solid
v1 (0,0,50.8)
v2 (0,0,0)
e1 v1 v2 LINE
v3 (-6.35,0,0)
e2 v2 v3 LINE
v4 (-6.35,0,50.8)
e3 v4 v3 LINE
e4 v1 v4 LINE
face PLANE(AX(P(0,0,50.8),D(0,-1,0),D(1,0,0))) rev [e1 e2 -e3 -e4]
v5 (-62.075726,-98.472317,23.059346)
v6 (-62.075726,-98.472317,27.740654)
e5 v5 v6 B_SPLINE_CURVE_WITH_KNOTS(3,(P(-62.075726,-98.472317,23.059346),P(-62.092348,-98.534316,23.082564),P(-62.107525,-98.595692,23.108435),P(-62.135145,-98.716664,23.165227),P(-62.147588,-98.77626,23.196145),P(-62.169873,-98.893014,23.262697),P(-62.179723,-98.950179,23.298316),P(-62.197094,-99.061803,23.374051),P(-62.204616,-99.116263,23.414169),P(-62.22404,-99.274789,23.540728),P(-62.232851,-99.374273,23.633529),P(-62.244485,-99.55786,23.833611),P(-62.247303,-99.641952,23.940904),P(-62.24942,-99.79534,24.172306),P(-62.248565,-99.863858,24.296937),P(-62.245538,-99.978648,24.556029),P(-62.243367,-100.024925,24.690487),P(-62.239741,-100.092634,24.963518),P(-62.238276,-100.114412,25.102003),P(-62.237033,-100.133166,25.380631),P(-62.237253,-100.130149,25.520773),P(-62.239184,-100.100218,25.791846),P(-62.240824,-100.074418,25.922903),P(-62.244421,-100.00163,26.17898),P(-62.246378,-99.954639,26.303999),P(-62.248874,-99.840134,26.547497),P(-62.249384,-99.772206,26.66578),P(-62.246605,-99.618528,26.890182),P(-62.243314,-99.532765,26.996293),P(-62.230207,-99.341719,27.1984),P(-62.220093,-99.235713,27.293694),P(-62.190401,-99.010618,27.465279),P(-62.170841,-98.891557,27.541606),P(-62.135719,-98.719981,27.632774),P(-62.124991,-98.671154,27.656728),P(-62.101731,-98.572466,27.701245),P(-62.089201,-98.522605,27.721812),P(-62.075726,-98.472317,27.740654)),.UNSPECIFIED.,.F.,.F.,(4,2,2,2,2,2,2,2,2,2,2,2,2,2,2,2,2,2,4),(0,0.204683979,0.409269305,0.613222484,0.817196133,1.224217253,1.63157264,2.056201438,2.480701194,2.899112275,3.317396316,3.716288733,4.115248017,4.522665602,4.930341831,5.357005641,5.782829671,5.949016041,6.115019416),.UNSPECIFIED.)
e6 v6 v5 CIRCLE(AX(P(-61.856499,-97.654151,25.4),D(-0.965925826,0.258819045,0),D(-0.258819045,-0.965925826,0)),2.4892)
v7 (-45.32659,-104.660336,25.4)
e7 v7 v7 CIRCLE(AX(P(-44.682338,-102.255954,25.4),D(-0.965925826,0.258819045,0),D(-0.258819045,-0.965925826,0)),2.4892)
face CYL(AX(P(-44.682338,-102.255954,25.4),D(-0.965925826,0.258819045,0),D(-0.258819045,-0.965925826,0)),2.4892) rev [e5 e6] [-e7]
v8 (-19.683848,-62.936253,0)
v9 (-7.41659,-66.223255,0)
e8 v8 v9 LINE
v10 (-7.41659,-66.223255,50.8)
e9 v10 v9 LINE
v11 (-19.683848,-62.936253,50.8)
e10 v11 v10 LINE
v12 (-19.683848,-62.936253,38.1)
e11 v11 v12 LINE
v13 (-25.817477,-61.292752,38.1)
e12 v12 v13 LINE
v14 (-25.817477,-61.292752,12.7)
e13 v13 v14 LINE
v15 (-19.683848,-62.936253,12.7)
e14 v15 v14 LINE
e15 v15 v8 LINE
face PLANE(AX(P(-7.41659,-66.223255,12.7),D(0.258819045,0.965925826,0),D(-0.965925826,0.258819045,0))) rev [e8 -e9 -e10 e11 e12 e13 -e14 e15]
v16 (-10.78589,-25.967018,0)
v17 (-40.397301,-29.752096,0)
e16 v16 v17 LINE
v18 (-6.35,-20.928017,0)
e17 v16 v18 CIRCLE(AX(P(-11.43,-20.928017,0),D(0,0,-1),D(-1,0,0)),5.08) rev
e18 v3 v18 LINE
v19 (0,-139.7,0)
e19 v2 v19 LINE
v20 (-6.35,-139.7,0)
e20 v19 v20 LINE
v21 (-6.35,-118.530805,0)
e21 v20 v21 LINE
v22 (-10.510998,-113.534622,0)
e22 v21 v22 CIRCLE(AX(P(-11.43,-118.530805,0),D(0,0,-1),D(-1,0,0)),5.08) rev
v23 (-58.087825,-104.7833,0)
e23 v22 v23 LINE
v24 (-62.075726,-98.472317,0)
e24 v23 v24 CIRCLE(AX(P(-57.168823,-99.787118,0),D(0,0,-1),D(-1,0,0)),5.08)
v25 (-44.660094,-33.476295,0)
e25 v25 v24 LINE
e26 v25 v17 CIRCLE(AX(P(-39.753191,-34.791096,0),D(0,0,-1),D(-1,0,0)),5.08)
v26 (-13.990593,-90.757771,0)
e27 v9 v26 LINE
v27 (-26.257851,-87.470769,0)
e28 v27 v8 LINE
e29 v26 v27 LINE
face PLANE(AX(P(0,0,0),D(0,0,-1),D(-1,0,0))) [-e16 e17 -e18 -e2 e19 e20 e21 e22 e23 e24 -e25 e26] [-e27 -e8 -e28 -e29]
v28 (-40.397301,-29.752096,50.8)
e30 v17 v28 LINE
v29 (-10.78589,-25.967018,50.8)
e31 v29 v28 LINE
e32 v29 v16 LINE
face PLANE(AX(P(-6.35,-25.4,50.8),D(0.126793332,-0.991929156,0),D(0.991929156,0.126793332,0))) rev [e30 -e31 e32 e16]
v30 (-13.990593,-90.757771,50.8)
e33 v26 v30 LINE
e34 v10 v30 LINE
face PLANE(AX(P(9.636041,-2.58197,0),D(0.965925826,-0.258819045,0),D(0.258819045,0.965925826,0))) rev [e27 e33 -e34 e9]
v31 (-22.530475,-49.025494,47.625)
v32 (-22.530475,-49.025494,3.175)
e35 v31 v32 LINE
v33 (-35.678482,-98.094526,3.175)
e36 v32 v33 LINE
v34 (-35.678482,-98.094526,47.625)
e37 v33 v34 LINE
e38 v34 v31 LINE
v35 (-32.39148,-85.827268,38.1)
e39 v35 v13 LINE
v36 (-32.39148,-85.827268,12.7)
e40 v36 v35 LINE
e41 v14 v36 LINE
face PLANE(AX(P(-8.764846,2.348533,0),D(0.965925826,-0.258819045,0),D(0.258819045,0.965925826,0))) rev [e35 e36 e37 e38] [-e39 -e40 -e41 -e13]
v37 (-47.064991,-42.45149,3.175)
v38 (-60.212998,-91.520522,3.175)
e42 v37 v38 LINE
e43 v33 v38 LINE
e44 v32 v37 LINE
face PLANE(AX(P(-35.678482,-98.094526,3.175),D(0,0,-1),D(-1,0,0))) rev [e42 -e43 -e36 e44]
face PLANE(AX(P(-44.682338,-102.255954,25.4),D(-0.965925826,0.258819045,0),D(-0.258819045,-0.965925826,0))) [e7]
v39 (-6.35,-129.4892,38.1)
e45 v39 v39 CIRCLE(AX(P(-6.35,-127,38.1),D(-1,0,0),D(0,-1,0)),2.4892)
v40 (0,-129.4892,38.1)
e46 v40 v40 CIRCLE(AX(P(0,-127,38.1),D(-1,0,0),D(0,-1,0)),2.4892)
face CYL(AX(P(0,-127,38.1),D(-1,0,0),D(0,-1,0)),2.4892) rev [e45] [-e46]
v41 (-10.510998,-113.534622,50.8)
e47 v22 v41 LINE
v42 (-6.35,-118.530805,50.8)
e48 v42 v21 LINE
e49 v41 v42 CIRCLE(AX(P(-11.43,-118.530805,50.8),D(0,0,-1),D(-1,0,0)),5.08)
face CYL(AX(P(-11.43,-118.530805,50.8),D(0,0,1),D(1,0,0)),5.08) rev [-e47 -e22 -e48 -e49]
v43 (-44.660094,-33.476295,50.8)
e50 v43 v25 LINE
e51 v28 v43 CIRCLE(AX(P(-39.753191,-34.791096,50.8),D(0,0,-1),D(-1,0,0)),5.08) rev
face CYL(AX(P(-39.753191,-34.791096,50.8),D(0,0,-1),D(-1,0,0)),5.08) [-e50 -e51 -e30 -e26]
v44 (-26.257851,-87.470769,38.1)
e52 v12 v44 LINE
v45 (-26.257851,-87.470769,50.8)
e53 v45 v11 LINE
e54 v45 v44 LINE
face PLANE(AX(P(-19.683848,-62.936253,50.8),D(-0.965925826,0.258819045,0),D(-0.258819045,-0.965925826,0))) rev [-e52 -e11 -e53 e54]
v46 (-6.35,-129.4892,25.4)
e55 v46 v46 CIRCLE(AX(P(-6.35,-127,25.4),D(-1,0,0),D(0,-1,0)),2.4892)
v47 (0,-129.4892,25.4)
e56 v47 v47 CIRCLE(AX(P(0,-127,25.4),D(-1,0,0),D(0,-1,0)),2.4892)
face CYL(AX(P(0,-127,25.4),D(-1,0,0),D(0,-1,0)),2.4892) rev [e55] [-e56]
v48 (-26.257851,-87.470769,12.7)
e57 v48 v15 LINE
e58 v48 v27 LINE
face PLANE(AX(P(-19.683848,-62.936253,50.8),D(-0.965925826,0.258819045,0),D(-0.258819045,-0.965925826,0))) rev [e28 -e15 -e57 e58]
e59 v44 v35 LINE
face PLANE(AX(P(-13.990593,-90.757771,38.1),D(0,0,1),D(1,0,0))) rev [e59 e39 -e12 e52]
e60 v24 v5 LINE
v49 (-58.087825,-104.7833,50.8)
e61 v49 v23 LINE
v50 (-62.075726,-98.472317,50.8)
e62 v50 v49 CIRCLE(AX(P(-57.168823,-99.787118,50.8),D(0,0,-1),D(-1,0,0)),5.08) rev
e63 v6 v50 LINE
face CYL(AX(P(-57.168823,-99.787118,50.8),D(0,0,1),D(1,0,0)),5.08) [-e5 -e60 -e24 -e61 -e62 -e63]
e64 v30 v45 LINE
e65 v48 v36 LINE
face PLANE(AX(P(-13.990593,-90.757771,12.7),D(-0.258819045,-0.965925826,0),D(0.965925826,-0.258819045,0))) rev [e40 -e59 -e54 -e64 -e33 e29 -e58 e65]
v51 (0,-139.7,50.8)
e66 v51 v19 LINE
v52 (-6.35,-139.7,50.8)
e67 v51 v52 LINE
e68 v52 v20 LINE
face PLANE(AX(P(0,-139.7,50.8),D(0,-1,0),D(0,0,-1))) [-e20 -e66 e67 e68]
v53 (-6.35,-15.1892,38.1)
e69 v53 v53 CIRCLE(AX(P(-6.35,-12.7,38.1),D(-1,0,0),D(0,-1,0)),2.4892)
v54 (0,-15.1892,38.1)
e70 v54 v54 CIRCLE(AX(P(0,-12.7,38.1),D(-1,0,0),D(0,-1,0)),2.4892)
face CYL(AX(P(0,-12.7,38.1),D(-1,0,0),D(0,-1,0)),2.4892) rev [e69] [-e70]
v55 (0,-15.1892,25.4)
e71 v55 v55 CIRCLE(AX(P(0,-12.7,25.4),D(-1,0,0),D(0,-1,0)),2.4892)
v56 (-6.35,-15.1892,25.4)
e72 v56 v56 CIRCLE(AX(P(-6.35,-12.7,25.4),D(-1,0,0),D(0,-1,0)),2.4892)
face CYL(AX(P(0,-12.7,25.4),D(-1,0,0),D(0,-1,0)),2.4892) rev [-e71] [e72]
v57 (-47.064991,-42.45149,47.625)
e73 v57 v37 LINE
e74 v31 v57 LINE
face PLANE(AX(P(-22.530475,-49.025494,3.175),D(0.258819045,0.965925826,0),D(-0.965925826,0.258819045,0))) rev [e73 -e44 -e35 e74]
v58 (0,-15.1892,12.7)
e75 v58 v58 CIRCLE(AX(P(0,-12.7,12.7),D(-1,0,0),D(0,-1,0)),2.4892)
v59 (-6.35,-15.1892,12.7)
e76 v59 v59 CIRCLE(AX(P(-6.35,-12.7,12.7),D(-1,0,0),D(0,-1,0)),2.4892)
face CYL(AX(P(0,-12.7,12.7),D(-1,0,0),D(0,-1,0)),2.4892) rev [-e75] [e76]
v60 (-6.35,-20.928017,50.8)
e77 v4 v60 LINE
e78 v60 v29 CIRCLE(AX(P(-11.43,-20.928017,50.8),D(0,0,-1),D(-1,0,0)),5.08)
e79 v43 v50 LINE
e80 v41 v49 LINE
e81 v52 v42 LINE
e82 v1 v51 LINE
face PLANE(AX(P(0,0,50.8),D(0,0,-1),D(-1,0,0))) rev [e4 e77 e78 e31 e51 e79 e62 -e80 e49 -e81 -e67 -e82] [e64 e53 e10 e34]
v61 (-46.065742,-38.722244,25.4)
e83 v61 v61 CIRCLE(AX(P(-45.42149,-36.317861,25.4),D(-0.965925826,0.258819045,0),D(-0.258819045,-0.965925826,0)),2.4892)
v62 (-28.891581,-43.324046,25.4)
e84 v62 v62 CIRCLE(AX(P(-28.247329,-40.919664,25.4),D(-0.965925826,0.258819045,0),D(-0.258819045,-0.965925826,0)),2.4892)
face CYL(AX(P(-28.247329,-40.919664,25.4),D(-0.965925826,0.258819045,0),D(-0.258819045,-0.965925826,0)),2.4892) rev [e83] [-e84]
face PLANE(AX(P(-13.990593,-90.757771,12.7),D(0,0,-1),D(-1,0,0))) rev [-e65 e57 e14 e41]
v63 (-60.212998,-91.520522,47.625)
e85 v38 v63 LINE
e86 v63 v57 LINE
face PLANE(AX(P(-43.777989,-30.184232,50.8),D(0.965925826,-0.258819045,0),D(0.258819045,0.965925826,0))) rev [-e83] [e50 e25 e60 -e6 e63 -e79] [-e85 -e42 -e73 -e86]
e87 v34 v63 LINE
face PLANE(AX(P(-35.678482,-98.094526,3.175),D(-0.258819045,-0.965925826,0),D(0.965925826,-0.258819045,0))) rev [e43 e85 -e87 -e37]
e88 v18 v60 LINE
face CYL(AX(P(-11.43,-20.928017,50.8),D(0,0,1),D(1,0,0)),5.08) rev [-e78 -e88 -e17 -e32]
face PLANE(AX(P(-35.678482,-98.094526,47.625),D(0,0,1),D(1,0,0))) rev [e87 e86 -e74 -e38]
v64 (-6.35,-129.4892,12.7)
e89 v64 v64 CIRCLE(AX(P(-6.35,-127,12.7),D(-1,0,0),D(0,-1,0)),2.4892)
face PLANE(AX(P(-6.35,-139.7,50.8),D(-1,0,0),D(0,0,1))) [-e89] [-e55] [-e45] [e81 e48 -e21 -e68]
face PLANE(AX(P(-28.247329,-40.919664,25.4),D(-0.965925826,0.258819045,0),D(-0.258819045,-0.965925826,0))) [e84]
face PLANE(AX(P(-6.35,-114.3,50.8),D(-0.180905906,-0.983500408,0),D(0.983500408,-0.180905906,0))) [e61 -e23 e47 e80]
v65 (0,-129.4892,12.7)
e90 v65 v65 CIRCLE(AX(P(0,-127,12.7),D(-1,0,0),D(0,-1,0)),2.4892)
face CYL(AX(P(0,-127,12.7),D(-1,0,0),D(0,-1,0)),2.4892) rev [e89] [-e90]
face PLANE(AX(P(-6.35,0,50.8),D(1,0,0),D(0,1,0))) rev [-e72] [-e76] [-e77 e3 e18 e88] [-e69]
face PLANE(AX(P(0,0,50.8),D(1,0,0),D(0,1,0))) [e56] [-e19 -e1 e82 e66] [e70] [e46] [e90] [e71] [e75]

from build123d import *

# Parameters (mm, degrees)
BOSS_EXTRUDE1_DEPTH     = 50.8
SKETCH3_W               = 44.45
SKETCH3_H               = 50.8
CUT_EXTRUDE1_DEPTH      = 25.4
SKETCH4_R               = 2.4892
CUT_EXTRUDE2_DEPTH      = 17.78
SKETCH7_W               = 25.4
SKETCH7_H               = 25.4
CUT_EXTRUDE3_DEPTH      = 19.05
CUT_EXTRUDE4_DEPTH      = 159.113724894
CUT_EXTRUDE4_DEPTH_BACK = 159.113724894
SKETCH10_R              = 2.4892
CUT_EXTRUDE5_DEPTH      = 160.257189791
FILLET1_R               = 5.08


with BuildPart() as part:
    # Sketch1 → Boss-Extrude1 (new body)
    with BuildSketch(Plane.XY):
        Polygon((0, 0), (0, -139.7), (-6.35, -139.7), (-6.35, -114.3), (-63.5, -103.787780153), (-43.777988763, -30.184232189), (-6.35, -25.4), (-6.35, 0), align=None)
    extrude(amount=BOSS_EXTRUDE1_DEPTH)

    # Sketch3 → Cut-Extrude1 (cut)
    with BuildSketch(Plane(origin=(-33.299361532, 8.922537031, 0), x_dir=(0, 0, 1), z_dir=(-0.9659258262890682, 0.2588190451025214, 0))):
        with Locations((25.4, -78.586306667)):
            Rectangle(SKETCH3_W, SKETCH3_H)
    extrude(amount=-CUT_EXTRUDE1_DEPTH, mode=Mode.SUBTRACT)

    # Sketch4 → Cut-Extrude2 (cut)
    with BuildSketch(Plane(origin=(-33.299361532, 8.922537031, 0), x_dir=(0, 0, 1), z_dir=(-0.9659258262890682, 0.2588190451025214, 0))):
        with Locations(Location((25.4, -46.836306667, 0), (0, 0, 270))):
            Circle(SKETCH4_R)
        with Locations(Location((25.4, -110.336306667, 0), (0, 0, 270))):
            Circle(SKETCH4_R)
    extrude(amount=-CUT_EXTRUDE2_DEPTH, mode=Mode.SUBTRACT)

    # Sketch7 → Cut-Extrude3 (cut)
    with BuildSketch(Plane(origin=(-8.764845544, 2.348533285, 0), x_dir=(0, 0, 1), z_dir=(-0.9659258262890681, 0.25881904510252124, 0))):
        with Locations((25.4, -78.586306667)):
            Rectangle(SKETCH7_W, SKETCH7_H)
    extrude(amount=-CUT_EXTRUDE3_DEPTH, mode=Mode.SUBTRACT)

    # Sketch9 → Cut-Extrude4 (cut, two sides: drawn at the far end of the back side and taken through both)
    with BuildSketch(Plane(origin=(0, 0, 38.1), x_dir=(-1, 0, 0), z_dir=(0, 0, -1)).offset(-CUT_EXTRUDE4_DEPTH_BACK)):
        Polygon((7.41658953, -66.223254732), (13.990593276, -90.75777072), (26.25785127, -87.470768847), (19.683847524, -62.936252859), align=None)
    extrude(amount=CUT_EXTRUDE4_DEPTH + CUT_EXTRUDE4_DEPTH_BACK, mode=Mode.SUBTRACT)

    # Sketch10 → Cut-Extrude5 (cut, through all)
    with BuildSketch(Plane.ZY.offset(6.35)):
        with Locations(Location((25.4, -12.7, 0), (0, 0, 270))):
            Circle(SKETCH10_R)
        with Locations(Location((12.7, -12.7, 0), (0, 0, 270))):
            Circle(SKETCH10_R)
        with Locations(Location((12.7, -127, 0), (0, 0, 270))):
            Circle(SKETCH10_R)
        with Locations(Location((38.1, -127, 0), (0, 0, 270))):
            Circle(SKETCH10_R)
        with Locations(Location((38.1, -12.7, 0), (0, 0, 270))):
            Circle(SKETCH10_R)
        with Locations(Location((25.4, -127, 0), (0, 0, 270))):
            Circle(SKETCH10_R)
    extrude(amount=-CUT_EXTRUDE5_DEPTH, mode=Mode.SUBTRACT)

    # Fillet1
    # the kernel refuses this fillet: 5.08 mm, written as the material it adds along each edge
    with BuildSketch(Plane(origin=(-6.35, -25.4, 0), x_dir=(0, 1, 0), z_dir=(0, 0, 1))) as fillet1_piece_1:
        with BuildLine():
            CenterArc((FILLET1_R * 0.880311524947, FILLET1_R), FILLET1_R, 187.284330246, 82.715669754)
            Line((-FILLET1_R * 0.111617631295, FILLET1_R * 0.873206668172), (0, 0))
            Line((0, 0), (FILLET1_R * 0.880311524947, 0))
        make_face()
    extrude(amount=50.8)
    with BuildSketch(Plane(origin=(-6.35, -114.3, 0), x_dir=(0, -1, 0), z_dir=(0, 0, 1))) as fillet1_piece_2:
        with BuildLine():
            CenterArc((FILLET1_R * 0.832835540577, -FILLET1_R), FILLET1_R, 90, 79.57746931)
            Line((-FILLET1_R * 0.150664867797, -FILLET1_R * 0.819094094265), (0, 0))
            Line((0, 0), (FILLET1_R * 0.832835540577, 0))
        make_face()
    extrude(amount=50.8)
    # the kernel refuses this fillet: 5.08 mm, written as the material it takes off along each edge
    with BuildSketch(Plane(origin=(-43.777988763, -30.184232189, -8.520486112), x_dir=(0.9919291562424372, 0.12679333182847863, 0), z_dir=(0, 0, 1))) as fillet1_2_piece_1:
        with BuildLine():
            CenterArc((FILLET1_R * 0.670904418298, -FILLET1_R), FILLET1_R, 90, 67.715669754)
            Line((-FILLET1_R * 0.254409042496, -FILLET1_R * 0.620796889158), (0, 0))
            Line((0, 0), (FILLET1_R * 0.670904418298, 0))
        make_face()
    extrude(amount=67.840972225, mode=Mode.SUBTRACT)
    with BuildSketch(Plane(origin=(-63.5, -103.787780153, -13.757429812), x_dir=(0.983500408373109, -0.18090590573535092, 0), z_dir=(0, 0, 1))) as fillet1_2_piece_2:
        with BuildLine():
            CenterArc((FILLET1_R * 1.0832621899, FILLET1_R), FILLET1_R, 175.42253069, 94.57746931)
            Line((FILLET1_R * 0.0864518515073, FILLET1_R * 1.07980695008), (0, 0))
            Line((0, 0), (FILLET1_R * 1.0832621899, 0))
        make_face()
    extrude(amount=78.314859623, mode=Mode.SUBTRACT)


solid = part.part
